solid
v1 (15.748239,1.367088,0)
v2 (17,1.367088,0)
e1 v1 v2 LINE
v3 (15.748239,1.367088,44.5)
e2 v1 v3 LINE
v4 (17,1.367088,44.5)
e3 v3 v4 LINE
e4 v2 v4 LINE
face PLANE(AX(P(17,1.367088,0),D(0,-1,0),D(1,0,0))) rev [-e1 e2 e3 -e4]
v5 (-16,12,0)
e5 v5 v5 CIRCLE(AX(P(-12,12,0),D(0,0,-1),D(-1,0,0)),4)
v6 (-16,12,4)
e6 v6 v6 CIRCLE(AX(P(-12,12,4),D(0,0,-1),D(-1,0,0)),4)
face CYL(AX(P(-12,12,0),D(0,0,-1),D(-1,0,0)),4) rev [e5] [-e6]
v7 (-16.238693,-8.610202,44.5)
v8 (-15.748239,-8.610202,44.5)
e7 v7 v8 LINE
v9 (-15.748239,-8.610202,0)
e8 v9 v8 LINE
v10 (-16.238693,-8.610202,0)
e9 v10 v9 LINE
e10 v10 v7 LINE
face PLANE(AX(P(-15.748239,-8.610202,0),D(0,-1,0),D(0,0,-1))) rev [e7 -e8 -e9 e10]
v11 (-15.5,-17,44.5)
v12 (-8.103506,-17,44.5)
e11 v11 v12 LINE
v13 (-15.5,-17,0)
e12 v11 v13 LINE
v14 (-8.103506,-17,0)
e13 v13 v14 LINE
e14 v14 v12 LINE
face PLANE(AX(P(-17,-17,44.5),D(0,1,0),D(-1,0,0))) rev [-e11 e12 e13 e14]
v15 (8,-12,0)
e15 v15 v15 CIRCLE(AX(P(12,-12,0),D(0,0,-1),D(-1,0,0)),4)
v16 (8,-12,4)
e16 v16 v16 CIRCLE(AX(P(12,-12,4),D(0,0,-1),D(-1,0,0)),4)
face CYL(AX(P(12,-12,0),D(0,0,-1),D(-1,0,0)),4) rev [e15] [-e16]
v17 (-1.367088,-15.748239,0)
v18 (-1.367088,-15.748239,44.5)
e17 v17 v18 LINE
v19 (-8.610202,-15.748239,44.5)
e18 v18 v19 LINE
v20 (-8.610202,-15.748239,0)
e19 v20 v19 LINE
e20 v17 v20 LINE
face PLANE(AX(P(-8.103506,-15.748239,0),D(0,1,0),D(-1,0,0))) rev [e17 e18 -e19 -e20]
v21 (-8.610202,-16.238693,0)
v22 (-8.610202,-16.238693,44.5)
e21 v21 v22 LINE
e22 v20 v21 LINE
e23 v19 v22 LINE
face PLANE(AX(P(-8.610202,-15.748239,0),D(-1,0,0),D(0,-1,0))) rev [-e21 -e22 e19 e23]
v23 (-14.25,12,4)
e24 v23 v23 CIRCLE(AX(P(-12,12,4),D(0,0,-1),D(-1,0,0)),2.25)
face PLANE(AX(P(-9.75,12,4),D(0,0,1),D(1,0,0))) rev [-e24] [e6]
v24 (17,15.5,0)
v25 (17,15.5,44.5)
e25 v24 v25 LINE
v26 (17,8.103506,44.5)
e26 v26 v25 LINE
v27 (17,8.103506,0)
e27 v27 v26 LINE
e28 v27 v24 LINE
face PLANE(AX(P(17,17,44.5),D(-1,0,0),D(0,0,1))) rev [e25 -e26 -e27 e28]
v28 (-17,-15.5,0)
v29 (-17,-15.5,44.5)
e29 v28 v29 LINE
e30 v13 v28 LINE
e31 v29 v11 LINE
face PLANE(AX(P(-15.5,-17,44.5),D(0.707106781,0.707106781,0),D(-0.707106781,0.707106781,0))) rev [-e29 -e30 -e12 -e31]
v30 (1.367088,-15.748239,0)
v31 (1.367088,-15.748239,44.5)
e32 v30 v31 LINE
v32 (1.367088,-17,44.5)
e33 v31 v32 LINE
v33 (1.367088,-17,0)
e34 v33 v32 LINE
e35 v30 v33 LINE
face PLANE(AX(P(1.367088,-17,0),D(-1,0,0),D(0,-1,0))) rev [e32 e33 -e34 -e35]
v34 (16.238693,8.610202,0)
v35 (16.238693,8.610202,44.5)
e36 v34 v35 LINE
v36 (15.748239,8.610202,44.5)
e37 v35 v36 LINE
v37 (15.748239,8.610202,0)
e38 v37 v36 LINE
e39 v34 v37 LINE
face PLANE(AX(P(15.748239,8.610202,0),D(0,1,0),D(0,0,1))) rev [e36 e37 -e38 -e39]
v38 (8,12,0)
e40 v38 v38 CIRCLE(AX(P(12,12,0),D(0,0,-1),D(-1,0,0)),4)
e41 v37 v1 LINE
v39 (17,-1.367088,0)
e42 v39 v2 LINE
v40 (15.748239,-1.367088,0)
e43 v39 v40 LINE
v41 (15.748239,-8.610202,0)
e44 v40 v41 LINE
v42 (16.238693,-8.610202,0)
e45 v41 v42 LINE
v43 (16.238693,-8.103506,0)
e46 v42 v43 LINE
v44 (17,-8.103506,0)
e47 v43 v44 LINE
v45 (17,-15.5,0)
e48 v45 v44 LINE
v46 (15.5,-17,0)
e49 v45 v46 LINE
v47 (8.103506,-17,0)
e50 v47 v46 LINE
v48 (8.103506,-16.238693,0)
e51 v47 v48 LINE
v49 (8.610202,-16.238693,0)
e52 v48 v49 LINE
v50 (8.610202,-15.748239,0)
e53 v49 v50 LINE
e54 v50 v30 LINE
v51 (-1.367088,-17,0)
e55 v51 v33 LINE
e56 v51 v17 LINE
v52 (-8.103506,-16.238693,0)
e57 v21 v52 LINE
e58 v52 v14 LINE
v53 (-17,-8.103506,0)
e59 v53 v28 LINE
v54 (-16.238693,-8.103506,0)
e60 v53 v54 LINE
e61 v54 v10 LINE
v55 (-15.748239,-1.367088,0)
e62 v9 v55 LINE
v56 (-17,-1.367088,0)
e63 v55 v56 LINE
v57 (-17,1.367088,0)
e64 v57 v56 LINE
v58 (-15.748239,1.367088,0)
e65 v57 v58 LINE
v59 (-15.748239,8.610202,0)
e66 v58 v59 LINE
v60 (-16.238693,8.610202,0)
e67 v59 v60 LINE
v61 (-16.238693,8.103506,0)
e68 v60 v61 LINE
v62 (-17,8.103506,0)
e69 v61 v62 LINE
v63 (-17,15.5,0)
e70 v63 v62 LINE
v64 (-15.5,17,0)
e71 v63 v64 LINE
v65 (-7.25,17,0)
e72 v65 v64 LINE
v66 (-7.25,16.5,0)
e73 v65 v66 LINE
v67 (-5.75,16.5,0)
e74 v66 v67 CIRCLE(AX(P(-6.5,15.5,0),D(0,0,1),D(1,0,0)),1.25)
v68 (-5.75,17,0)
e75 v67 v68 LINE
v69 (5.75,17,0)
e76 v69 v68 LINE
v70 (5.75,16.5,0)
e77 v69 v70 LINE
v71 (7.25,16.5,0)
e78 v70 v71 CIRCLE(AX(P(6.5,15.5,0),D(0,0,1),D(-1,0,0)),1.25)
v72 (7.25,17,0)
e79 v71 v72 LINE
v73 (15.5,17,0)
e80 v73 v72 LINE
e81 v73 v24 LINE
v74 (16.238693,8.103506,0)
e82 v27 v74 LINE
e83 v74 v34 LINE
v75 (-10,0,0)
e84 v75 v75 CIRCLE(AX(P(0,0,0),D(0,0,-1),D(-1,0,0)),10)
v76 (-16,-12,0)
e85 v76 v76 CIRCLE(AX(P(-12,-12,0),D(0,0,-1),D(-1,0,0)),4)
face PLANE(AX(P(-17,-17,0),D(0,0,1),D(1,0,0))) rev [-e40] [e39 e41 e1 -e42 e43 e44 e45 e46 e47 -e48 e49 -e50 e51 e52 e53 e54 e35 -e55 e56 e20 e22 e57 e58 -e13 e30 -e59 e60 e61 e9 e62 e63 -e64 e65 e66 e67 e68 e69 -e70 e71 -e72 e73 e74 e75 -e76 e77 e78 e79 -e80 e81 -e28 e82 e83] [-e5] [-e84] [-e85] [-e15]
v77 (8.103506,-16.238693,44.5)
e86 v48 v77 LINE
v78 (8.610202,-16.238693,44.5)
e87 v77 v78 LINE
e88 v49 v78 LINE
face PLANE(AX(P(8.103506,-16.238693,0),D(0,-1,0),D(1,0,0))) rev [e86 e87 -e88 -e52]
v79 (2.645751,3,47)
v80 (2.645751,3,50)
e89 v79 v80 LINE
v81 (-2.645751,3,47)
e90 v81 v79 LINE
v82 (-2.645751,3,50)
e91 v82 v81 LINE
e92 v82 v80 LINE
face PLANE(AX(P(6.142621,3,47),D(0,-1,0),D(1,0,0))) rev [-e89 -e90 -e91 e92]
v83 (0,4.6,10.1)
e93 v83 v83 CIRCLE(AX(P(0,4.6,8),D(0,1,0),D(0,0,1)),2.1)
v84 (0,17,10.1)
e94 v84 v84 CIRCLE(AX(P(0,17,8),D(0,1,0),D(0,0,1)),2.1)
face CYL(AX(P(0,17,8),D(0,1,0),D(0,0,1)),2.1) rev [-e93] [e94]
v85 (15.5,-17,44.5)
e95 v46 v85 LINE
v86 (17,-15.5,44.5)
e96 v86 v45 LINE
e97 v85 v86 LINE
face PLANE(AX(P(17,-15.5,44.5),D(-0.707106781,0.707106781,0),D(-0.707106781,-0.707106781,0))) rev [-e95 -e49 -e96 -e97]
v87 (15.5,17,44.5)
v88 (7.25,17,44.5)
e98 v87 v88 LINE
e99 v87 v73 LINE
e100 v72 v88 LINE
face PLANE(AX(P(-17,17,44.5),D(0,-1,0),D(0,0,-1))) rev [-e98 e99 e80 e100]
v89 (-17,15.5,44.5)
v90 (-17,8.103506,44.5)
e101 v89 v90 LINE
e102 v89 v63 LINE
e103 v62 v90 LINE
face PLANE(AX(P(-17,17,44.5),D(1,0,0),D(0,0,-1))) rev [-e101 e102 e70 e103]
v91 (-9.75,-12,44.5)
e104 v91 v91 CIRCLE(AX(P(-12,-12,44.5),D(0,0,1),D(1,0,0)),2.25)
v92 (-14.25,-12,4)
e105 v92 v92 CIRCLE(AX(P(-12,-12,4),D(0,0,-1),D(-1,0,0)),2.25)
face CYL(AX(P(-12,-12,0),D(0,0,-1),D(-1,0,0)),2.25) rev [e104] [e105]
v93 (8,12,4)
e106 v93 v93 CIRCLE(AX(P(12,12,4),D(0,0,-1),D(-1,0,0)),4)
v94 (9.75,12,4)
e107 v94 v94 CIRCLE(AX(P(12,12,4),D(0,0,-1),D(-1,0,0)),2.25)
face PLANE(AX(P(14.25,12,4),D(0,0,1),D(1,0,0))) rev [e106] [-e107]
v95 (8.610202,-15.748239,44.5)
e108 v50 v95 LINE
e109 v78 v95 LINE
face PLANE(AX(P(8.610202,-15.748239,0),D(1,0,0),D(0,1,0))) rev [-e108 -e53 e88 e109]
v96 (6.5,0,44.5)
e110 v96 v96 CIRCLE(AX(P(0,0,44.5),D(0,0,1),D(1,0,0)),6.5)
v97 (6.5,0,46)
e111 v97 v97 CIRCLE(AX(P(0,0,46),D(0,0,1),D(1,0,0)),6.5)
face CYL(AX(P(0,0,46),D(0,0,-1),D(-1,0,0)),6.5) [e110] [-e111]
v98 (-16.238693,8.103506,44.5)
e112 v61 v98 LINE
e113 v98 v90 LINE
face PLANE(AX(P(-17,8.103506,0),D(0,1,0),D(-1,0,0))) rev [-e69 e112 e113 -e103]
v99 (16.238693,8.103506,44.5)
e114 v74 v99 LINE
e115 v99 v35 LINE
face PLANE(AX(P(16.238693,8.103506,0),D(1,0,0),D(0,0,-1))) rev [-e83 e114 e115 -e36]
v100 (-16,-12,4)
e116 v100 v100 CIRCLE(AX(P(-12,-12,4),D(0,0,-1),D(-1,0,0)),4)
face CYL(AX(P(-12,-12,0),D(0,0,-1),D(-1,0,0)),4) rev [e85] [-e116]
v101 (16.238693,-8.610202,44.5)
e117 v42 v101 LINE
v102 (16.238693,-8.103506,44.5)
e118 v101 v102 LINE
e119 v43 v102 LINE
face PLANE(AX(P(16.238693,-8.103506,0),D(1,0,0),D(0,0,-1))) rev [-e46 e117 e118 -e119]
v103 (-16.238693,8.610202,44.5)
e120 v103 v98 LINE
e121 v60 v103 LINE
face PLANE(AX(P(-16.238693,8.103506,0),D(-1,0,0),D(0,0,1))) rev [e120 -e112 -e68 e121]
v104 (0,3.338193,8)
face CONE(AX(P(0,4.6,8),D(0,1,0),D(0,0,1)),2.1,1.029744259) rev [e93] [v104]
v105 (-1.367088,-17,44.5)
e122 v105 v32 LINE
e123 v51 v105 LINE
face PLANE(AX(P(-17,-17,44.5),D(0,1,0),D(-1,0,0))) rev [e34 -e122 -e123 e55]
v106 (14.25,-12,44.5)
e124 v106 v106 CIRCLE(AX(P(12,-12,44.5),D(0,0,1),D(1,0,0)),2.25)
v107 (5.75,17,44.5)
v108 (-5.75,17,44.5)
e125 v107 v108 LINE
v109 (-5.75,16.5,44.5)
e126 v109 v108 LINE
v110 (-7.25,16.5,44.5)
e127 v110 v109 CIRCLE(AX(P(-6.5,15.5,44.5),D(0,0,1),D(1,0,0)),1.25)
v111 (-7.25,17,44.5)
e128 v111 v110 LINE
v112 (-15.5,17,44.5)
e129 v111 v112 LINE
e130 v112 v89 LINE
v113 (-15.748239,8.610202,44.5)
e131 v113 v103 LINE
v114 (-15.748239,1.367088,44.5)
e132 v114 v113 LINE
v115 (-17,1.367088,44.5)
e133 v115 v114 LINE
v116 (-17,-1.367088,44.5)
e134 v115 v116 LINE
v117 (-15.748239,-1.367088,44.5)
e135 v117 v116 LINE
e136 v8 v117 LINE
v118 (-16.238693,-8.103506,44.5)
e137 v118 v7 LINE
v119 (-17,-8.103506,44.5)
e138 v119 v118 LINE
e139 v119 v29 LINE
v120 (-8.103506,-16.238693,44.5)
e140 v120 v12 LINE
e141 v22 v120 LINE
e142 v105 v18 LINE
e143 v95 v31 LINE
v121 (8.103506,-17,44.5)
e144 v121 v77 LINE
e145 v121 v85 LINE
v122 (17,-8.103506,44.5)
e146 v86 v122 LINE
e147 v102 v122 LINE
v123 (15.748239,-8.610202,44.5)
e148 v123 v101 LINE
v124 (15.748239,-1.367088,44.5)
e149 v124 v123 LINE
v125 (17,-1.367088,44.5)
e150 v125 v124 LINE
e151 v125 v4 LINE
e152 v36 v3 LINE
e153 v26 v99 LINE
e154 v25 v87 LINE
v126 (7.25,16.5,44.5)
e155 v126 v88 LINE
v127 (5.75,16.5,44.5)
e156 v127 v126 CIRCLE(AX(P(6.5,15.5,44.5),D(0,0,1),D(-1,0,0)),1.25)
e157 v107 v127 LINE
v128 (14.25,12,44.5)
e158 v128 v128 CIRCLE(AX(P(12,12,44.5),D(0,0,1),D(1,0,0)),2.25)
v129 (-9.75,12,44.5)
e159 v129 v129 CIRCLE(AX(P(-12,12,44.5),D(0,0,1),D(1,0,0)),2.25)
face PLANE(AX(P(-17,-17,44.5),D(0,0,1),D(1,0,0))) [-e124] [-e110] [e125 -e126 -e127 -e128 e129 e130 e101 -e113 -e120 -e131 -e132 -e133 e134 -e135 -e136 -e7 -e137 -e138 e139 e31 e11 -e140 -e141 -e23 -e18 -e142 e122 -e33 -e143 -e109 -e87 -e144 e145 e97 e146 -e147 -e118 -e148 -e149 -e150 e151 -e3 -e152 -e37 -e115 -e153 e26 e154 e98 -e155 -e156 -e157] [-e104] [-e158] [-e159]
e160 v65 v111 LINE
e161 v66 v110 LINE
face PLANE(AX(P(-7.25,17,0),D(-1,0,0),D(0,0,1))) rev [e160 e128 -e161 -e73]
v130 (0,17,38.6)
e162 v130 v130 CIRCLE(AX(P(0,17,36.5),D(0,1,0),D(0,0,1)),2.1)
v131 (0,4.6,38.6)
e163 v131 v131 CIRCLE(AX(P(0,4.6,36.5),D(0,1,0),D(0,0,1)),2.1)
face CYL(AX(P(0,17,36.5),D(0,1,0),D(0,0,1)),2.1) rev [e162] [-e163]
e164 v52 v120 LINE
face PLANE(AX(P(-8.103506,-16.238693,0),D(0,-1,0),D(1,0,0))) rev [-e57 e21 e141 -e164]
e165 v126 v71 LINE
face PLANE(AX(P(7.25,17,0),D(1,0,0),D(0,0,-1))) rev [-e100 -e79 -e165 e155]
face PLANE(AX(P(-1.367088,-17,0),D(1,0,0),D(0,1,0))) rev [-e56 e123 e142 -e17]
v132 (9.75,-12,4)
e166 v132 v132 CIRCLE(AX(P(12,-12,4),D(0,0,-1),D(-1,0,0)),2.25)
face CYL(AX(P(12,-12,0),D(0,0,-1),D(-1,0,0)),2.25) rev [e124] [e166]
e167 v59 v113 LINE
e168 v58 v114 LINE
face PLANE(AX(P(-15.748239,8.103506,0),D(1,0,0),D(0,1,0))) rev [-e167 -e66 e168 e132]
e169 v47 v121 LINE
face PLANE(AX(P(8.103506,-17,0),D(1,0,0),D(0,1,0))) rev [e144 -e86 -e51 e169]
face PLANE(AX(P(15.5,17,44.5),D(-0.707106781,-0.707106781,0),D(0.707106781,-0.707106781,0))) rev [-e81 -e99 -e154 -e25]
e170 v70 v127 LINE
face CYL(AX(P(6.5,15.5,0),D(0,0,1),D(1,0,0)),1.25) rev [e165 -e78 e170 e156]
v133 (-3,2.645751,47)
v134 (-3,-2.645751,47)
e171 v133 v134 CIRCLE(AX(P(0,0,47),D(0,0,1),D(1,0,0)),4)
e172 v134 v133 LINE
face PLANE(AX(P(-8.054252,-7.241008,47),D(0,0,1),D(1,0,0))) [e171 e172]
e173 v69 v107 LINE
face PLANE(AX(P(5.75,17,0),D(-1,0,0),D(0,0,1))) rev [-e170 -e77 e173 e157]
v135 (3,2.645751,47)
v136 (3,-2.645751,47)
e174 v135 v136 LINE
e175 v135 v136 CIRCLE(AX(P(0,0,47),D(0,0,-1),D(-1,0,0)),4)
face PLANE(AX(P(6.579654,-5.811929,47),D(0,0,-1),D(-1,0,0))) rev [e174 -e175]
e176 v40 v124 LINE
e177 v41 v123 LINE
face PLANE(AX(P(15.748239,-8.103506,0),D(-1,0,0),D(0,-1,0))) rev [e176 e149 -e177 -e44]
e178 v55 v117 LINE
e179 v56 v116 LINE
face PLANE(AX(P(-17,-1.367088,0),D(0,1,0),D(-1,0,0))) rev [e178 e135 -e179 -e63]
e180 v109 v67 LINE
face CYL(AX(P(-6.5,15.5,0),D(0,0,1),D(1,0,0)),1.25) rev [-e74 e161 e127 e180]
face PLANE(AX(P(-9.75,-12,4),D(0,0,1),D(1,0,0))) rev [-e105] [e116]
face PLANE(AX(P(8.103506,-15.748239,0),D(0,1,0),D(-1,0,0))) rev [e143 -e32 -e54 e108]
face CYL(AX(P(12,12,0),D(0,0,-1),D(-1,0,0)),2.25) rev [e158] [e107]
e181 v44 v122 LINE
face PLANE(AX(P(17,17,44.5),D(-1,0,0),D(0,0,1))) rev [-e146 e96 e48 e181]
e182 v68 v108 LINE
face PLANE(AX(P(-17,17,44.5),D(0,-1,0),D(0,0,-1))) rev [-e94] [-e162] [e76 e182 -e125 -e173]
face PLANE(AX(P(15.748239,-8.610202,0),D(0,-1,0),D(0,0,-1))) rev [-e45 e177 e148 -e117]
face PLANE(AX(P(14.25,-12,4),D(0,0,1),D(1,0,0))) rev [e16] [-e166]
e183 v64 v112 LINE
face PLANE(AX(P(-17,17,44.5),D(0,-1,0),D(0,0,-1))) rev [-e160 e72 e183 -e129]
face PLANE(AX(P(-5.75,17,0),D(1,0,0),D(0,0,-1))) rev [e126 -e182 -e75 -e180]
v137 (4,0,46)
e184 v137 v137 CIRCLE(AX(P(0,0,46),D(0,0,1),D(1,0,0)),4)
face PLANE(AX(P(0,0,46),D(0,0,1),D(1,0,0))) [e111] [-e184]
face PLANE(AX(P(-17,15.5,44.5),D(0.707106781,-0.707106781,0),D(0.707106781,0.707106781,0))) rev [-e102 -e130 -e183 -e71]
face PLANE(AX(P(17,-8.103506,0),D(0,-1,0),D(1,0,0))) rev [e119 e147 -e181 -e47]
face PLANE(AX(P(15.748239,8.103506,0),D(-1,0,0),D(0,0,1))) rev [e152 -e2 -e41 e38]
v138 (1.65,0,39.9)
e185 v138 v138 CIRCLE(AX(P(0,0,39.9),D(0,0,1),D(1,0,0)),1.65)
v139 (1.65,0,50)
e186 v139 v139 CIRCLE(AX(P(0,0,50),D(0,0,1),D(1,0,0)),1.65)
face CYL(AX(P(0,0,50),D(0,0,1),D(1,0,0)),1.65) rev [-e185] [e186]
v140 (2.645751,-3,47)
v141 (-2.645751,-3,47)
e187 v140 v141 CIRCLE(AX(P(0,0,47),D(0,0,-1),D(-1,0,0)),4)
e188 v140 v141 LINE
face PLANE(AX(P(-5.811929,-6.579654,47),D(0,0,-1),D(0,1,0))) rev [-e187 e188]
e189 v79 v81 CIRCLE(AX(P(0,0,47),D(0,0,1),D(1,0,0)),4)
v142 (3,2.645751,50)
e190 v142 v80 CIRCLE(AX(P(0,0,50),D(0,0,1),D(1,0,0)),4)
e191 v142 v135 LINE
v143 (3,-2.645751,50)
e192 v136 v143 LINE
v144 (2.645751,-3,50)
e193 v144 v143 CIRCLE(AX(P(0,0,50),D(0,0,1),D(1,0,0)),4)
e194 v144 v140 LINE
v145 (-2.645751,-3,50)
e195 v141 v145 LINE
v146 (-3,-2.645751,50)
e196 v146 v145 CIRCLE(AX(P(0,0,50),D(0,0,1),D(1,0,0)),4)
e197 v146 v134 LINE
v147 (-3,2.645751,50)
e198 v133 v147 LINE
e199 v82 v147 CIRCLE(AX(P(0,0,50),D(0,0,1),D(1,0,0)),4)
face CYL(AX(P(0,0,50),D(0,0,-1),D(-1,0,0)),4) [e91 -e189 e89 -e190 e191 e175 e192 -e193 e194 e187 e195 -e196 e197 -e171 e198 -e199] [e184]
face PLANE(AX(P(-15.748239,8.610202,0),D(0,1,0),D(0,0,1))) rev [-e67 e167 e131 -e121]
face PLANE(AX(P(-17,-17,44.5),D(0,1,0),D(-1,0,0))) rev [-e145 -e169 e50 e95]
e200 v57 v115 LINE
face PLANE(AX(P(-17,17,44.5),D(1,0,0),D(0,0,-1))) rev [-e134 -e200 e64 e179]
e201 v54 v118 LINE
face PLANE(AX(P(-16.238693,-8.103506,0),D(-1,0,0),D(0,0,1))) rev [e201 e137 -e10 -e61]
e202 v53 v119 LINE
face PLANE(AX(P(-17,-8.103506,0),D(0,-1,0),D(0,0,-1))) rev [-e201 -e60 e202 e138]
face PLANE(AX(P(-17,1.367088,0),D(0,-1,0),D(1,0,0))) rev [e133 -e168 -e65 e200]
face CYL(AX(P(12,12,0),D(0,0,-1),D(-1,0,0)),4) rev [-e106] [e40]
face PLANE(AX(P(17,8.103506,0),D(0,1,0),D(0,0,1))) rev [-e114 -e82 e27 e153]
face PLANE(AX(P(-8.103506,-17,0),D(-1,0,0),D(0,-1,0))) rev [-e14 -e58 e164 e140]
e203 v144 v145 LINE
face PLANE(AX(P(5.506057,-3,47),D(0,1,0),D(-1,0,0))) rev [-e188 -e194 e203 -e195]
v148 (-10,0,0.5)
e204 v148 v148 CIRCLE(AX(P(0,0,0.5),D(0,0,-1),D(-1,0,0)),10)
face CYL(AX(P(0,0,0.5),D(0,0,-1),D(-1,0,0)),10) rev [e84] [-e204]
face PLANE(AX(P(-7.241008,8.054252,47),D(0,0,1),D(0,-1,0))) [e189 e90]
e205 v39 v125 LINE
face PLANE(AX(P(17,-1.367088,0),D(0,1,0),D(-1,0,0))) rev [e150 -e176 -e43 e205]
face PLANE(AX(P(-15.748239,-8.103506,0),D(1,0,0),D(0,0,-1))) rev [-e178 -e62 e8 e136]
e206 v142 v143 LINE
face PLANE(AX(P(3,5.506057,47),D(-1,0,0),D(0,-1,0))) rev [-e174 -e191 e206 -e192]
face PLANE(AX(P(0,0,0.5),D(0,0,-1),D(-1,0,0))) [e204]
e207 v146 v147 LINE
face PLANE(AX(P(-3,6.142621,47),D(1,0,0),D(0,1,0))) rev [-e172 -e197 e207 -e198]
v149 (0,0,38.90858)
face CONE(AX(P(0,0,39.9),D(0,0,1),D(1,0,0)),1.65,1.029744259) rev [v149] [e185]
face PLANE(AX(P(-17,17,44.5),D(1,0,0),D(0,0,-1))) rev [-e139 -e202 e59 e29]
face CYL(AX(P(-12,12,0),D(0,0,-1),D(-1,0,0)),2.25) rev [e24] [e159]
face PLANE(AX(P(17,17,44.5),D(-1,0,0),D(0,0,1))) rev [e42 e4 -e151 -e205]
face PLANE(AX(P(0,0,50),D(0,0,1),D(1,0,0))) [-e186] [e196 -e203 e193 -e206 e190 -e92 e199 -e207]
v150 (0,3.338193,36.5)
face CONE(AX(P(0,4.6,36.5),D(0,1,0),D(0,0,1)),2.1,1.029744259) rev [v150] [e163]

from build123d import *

# Parameters (mm, degrees)
SKETCH_1_W                     = 34
SKETCH_1_H                     = 34
EXTRUDE_1_DEPTH                = 44.5
SKETCH_2_R                     = 10
CUT_EXTRUDE_1_DEPTH            = 0.5
CUT_EXTRUDE_START              = -0.5
SKETCH_3_R                     = 10
CUT_EXTRUDE_2_DEPTH            = 0.5
SKETCH_4_R                     = 4
EXTRUDE_2_DEPTH                = 6
CHAMFER_1_SIZE                 = 1.5
HOLE_WIZARD_M4_1_D             = 4.5
HOLE_WIZARD_M4_1_CBORE_D       = 8
HOLE_WIZARD_M4_1_CBORE_DEPTH   = 4
HOLE_WIZARD_M4_1_2_D           = 3.3
HOLE_WIZARD_M4_1_2_DEPTH       = 10.1
HOLE_WIZARD_M4_1_2_TIP         = 0.991420021
SKETCH_9_W                     = 5.05425195
SKETCH_9_H                     = 13.3836291
SKETCH_9_W_2                   = 3.579653673
SKETCH_9_H_2                   = 11.317985889
CUT_EXTRUDE_3_DEPTH            = 3
SKETCH_14_R                    = 1.25
CUT_EXTRUDE_6_DEPTH            = 51.5791459
SKETCH_15_W                    = 1.5
SKETCH_15_H                    = 1
CUT_EXTRUDE_7_DEPTH            = 51.5791459
PATTERN_CIRCULAR_1_COUNT       = 2
PATTERN_CIRCULAR_1_ANGLE       = 90
SKETCH_16_R                    = 6.5
SKETCH_16_R_2                  = 1.65
EXTRUDE_3_DEPTH                = 2
EXTRUDE_START                  = 0.5
SKETCH_17_R                    = 10
SKETCH_17_R_2                  = 1.65
EXTRUDE_4_DEPTH                = 0.5
SKETCH_18_W                    = 1.251760675
SKETCH_18_H                    = 6.736418335
CUT_EXTRUDE_8_DEPTH            = 51.5791459
SKETCH_19_W                    = 0.490453646
SKETCH_19_H                    = 0.506695446
CUT_EXTRUDE_9_DEPTH            = 51.5791459
PATTERN_START                  = -17
PATTERN_CIRCULAR_2_OUTLINE_W   = 6.736418335
PATTERN_CIRCULAR_2_OUTLINE_H   = 44.5
PATTERN_CIRCULAR_2_DEPTH       = 1.251760675
PATTERN_START_2                = -8.103506379
PATTERN_CIRCULAR_2_2_OUTLINE_W = 1.251760675
PATTERN_CIRCULAR_2_2_OUTLINE_H = 44.5
PATTERN_CIRCULAR_2_2_DEPTH     = 6.736418335
PATTERN_START_3                = 1.367088044
PATTERN_CIRCULAR_2_3_OUTLINE_W = 1.251760675
PATTERN_CIRCULAR_2_3_OUTLINE_H = 44.5
PATTERN_CIRCULAR_2_3_DEPTH     = 6.736418335
PATTERN_START_4                = -16.238692971
PATTERN_CIRCULAR_2_4_OUTLINE_W = 0.506695446
PATTERN_CIRCULAR_2_4_OUTLINE_H = 44.5
PATTERN_CIRCULAR_2_4_DEPTH     = 0.490453646
PATTERN_START_5                = -8.610201825
PATTERN_CIRCULAR_2_5_OUTLINE_W = 0.490453646
PATTERN_CIRCULAR_2_5_OUTLINE_H = 44.5
PATTERN_CIRCULAR_2_5_DEPTH     = 0.506695446
PATTERN_START_6                = 8.103506379
PATTERN_CIRCULAR_2_6_OUTLINE_W = 0.490453646
PATTERN_CIRCULAR_2_6_OUTLINE_H = 44.5
PATTERN_CIRCULAR_2_6_DEPTH     = 0.506695446
HOLE_WIZARD_M5_1_D             = 4.2
HOLE_WIZARD_M5_1_DEPTH         = 12.4
HOLE_WIZARD_M5_1_TIP           = 1.2618073


# Read off the part's stored shape, not the designer's step: 阵列(圆周)2
with BuildPart() as part:
    # 草图1 → 凸台-拉伸1 (new body)
    with BuildSketch(Plane.XY):
        Rectangle(SKETCH_1_W, SKETCH_1_H)
    extrude(amount=EXTRUDE_1_DEPTH)

    # 草图2 → 切除-拉伸1 (cut)
    with BuildSketch(Plane.XY.offset(44.5)):
        Circle(SKETCH_2_R)
    extrude(amount=-CUT_EXTRUDE_1_DEPTH, mode=Mode.SUBTRACT)

    # 草图3 → 切除-拉伸2 (cut)
    with BuildSketch(Plane(origin=(0, 0, 0), x_dir=(-1, 0, 0), z_dir=(0, 0, -1)).offset(CUT_EXTRUDE_START)):
        with Locations(Location((0, 0, 0), (0, 0, 180))):
            Circle(SKETCH_3_R)
    extrude(amount=CUT_EXTRUDE_2_DEPTH, mode=Mode.SUBTRACT)

    # 草图4 → 凸台-拉伸2 (add)
    with BuildSketch(Plane.XY.offset(44)):
        Circle(SKETCH_4_R)
    extrude(amount=EXTRUDE_2_DEPTH)

    # 倒角1
    chamfer_1_edges = [part.edges().sort_by_distance(p)[0] for p in [
        (-17, 17, 22.25),
        (17, 17, 22.25),
        (17, -17, 22.25),
        (-17, -17, 22.25),
    ]]
    chamfer(chamfer_1_edges, length=CHAMFER_1_SIZE)

    # Hole Wizard M4 _1 (through all)
    with Locations(Plane(origin=(0, 0, 0), x_dir=(-1, 0, 0), z_dir=(0, 0, -1))):
        with Locations((-12, 12), (12, -12), (12, 12), (-12, -12)):
            CounterBoreHole(HOLE_WIZARD_M4_1_D / 2, HOLE_WIZARD_M4_1_CBORE_D / 2, HOLE_WIZARD_M4_1_CBORE_DEPTH)

    # Hole Wizard M4 _1 2
    with Locations(Plane.XY.offset(50)):
        with Locations((0, 0)):
            Hole(HOLE_WIZARD_M4_1_2_D / 2, depth=HOLE_WIZARD_M4_1_2_DEPTH)
            with Locations((0, 0, -(HOLE_WIZARD_M4_1_2_DEPTH + HOLE_WIZARD_M4_1_2_TIP / 2))):  # 118° drill point
                Cone(0, HOLE_WIZARD_M4_1_2_D / 2, HOLE_WIZARD_M4_1_2_TIP, mode=Mode.SUBTRACT)

    # 草图9 → 切除-拉伸3 (cut)
    with BuildSketch(Plane.XY.offset(50)):
        with Locations((-5.527125975, -0.54919334)):
            Rectangle(SKETCH_9_W, SKETCH_9_H)
        with Locations((4.789826836, -0.152935728)):
            Rectangle(SKETCH_9_W_2, SKETCH_9_H_2)
    cut_extrude_3 = extrude(amount=-CUT_EXTRUDE_3_DEPTH, mode=Mode.SUBTRACT)

    # 草图14 → 切除-拉伸6 (cut, through all)
    with BuildSketch(Plane.XY.offset(44.5)):
        with Locations((-6.5, 15.5)):
            Circle(SKETCH_14_R)
        with Locations(Location((6.5, 15.5, 0), (0, 0, 180))):
            Circle(SKETCH_14_R)
    extrude(amount=-CUT_EXTRUDE_6_DEPTH, mode=Mode.SUBTRACT)

    # 草图15 → 切除-拉伸7 (cut, through all)
    with BuildSketch(Plane.XY.offset(44.5)):
        with Locations((-6.5, 16.5)):
            Rectangle(SKETCH_15_W, SKETCH_15_H)
        with Locations((6.5, 16.5)):
            Rectangle(SKETCH_15_W, SKETCH_15_H)
    extrude(amount=-CUT_EXTRUDE_7_DEPTH, mode=Mode.SUBTRACT)

    # 阵列(圆周)1: 切除-拉伸3 ×2 about axis
    pattern_circular_1_axis = Axis((0, 0, 50), (0, 0, -1))
    for i in range(1, PATTERN_CIRCULAR_1_COUNT):
        add(cut_extrude_3.rotate(pattern_circular_1_axis, i * PATTERN_CIRCULAR_1_ANGLE / (PATTERN_CIRCULAR_1_COUNT - 1)), mode=Mode.SUBTRACT)

    # 草图16 → 凸台-拉伸3 (add)
    with BuildSketch(Plane.XY.offset(44)):
        Circle(SKETCH_16_R)
        Circle(SKETCH_16_R_2, mode=Mode.SUBTRACT)
    extrude(amount=EXTRUDE_3_DEPTH)

    # 草图17 → 凸台-拉伸4 (add)
    with BuildSketch(Plane.XY.offset(44).offset(EXTRUDE_START)):
        with Locations(Location((0, 0, 0), (0, 0, 180))):
            Circle(SKETCH_17_R)
        Circle(SKETCH_17_R_2, mode=Mode.SUBTRACT)
    extrude(amount=-EXTRUDE_4_DEPTH)

    # 草图18 → 切除-拉伸8 (cut, through all)
    with BuildSketch(Plane.XY.offset(44.5)):
        with Locations((16.374119663, 4.735297212)):
            Rectangle(SKETCH_18_W, SKETCH_18_H)
        with Locations((16.374119663, -4.735297212)):
            Rectangle(SKETCH_18_W, SKETCH_18_H)
    extrude(amount=-CUT_EXTRUDE_8_DEPTH, mode=Mode.SUBTRACT)

    # 草图19 → 切除-拉伸9 (cut, through all)
    with BuildSketch(Plane.XY.offset(44.5)):
        with Locations((15.993466148, 8.356854102)):
            Rectangle(SKETCH_19_W, SKETCH_19_H)
        with Locations((15.993466148, -8.356854102)):
            Rectangle(SKETCH_19_W, SKETCH_19_H)
    extrude(amount=-CUT_EXTRUDE_9_DEPTH, mode=Mode.SUBTRACT)

    # 阵列(圆周)2 outline → 阵列(圆周)2 (cut)
    with BuildSketch(Plane(origin=(0, 0, 0), x_dir=(1, 0, 0), z_dir=(0, 1, 0)).offset(PATTERN_START)):
        with Locations((4.735297212, -22.25)):
            Rectangle(PATTERN_CIRCULAR_2_OUTLINE_W, PATTERN_CIRCULAR_2_OUTLINE_H)
        with Locations((-4.735297212, -22.25)):
            Rectangle(PATTERN_CIRCULAR_2_OUTLINE_W, PATTERN_CIRCULAR_2_OUTLINE_H)
    extrude(amount=PATTERN_CIRCULAR_2_DEPTH, mode=Mode.SUBTRACT)

    # Pattern Circular 2 2 outline → Pattern Circular 2 2 (cut)
    with BuildSketch(Plane(origin=(0, 0, 0), x_dir=(1, 0, 0), z_dir=(0, 1, 0)).offset(PATTERN_START_2)):
        with Locations((-16.374119663, -22.25)):
            Rectangle(PATTERN_CIRCULAR_2_2_OUTLINE_W, PATTERN_CIRCULAR_2_2_OUTLINE_H)
    extrude(amount=PATTERN_CIRCULAR_2_2_DEPTH, mode=Mode.SUBTRACT)

    # Pattern Circular 2 3 outline → Pattern Circular 2 3 (cut)
    with BuildSketch(Plane(origin=(0, 0, 0), x_dir=(1, 0, 0), z_dir=(0, 1, 0)).offset(PATTERN_START_3)):
        with Locations((-16.374119663, -22.25)):
            Rectangle(PATTERN_CIRCULAR_2_3_OUTLINE_W, PATTERN_CIRCULAR_2_3_OUTLINE_H)
    extrude(amount=PATTERN_CIRCULAR_2_3_DEPTH, mode=Mode.SUBTRACT)

    # Pattern Circular 2 4 outline → Pattern Circular 2 4 (cut)
    with BuildSketch(Plane(origin=(0, 0, 0), x_dir=(1, 0, 0), z_dir=(0, 1, 0)).offset(PATTERN_START_4)):
        with Locations((8.356854102, -22.25)):
            Rectangle(PATTERN_CIRCULAR_2_4_OUTLINE_W, PATTERN_CIRCULAR_2_4_OUTLINE_H)
        with Locations((-8.356854102, -22.25)):
            Rectangle(PATTERN_CIRCULAR_2_4_OUTLINE_W, PATTERN_CIRCULAR_2_4_OUTLINE_H)
    extrude(amount=PATTERN_CIRCULAR_2_4_DEPTH, mode=Mode.SUBTRACT)

    # Pattern Circular 2 5 outline → Pattern Circular 2 5 (cut)
    with BuildSketch(Plane(origin=(0, 0, 0), x_dir=(1, 0, 0), z_dir=(0, 1, 0)).offset(PATTERN_START_5)):
        with Locations((-15.993466148, -22.25)):
            Rectangle(PATTERN_CIRCULAR_2_5_OUTLINE_W, PATTERN_CIRCULAR_2_5_OUTLINE_H)
    extrude(amount=PATTERN_CIRCULAR_2_5_DEPTH, mode=Mode.SUBTRACT)

    # Pattern Circular 2 6 outline → Pattern Circular 2 6 (cut)
    with BuildSketch(Plane(origin=(0, 0, 0), x_dir=(1, 0, 0), z_dir=(0, 1, 0)).offset(PATTERN_START_6)):
        with Locations((-15.993466148, -22.25)):
            Rectangle(PATTERN_CIRCULAR_2_6_OUTLINE_W, PATTERN_CIRCULAR_2_6_OUTLINE_H)
    extrude(amount=PATTERN_CIRCULAR_2_6_DEPTH, mode=Mode.SUBTRACT)

    # M5 螺纹孔1
    with Locations(Plane(origin=(0, 17, 0), x_dir=(-1, 0, 0), z_dir=(0, 1, 0))):
        with Locations((0, 36.5), (0, 8)):
            Hole(HOLE_WIZARD_M5_1_D / 2, depth=HOLE_WIZARD_M5_1_DEPTH)
            with Locations((0, 0, -(HOLE_WIZARD_M5_1_DEPTH + HOLE_WIZARD_M5_1_TIP / 2))):  # 118° drill point
                Cone(0, HOLE_WIZARD_M5_1_D / 2, HOLE_WIZARD_M5_1_TIP, mode=Mode.SUBTRACT)


solid = part.part
